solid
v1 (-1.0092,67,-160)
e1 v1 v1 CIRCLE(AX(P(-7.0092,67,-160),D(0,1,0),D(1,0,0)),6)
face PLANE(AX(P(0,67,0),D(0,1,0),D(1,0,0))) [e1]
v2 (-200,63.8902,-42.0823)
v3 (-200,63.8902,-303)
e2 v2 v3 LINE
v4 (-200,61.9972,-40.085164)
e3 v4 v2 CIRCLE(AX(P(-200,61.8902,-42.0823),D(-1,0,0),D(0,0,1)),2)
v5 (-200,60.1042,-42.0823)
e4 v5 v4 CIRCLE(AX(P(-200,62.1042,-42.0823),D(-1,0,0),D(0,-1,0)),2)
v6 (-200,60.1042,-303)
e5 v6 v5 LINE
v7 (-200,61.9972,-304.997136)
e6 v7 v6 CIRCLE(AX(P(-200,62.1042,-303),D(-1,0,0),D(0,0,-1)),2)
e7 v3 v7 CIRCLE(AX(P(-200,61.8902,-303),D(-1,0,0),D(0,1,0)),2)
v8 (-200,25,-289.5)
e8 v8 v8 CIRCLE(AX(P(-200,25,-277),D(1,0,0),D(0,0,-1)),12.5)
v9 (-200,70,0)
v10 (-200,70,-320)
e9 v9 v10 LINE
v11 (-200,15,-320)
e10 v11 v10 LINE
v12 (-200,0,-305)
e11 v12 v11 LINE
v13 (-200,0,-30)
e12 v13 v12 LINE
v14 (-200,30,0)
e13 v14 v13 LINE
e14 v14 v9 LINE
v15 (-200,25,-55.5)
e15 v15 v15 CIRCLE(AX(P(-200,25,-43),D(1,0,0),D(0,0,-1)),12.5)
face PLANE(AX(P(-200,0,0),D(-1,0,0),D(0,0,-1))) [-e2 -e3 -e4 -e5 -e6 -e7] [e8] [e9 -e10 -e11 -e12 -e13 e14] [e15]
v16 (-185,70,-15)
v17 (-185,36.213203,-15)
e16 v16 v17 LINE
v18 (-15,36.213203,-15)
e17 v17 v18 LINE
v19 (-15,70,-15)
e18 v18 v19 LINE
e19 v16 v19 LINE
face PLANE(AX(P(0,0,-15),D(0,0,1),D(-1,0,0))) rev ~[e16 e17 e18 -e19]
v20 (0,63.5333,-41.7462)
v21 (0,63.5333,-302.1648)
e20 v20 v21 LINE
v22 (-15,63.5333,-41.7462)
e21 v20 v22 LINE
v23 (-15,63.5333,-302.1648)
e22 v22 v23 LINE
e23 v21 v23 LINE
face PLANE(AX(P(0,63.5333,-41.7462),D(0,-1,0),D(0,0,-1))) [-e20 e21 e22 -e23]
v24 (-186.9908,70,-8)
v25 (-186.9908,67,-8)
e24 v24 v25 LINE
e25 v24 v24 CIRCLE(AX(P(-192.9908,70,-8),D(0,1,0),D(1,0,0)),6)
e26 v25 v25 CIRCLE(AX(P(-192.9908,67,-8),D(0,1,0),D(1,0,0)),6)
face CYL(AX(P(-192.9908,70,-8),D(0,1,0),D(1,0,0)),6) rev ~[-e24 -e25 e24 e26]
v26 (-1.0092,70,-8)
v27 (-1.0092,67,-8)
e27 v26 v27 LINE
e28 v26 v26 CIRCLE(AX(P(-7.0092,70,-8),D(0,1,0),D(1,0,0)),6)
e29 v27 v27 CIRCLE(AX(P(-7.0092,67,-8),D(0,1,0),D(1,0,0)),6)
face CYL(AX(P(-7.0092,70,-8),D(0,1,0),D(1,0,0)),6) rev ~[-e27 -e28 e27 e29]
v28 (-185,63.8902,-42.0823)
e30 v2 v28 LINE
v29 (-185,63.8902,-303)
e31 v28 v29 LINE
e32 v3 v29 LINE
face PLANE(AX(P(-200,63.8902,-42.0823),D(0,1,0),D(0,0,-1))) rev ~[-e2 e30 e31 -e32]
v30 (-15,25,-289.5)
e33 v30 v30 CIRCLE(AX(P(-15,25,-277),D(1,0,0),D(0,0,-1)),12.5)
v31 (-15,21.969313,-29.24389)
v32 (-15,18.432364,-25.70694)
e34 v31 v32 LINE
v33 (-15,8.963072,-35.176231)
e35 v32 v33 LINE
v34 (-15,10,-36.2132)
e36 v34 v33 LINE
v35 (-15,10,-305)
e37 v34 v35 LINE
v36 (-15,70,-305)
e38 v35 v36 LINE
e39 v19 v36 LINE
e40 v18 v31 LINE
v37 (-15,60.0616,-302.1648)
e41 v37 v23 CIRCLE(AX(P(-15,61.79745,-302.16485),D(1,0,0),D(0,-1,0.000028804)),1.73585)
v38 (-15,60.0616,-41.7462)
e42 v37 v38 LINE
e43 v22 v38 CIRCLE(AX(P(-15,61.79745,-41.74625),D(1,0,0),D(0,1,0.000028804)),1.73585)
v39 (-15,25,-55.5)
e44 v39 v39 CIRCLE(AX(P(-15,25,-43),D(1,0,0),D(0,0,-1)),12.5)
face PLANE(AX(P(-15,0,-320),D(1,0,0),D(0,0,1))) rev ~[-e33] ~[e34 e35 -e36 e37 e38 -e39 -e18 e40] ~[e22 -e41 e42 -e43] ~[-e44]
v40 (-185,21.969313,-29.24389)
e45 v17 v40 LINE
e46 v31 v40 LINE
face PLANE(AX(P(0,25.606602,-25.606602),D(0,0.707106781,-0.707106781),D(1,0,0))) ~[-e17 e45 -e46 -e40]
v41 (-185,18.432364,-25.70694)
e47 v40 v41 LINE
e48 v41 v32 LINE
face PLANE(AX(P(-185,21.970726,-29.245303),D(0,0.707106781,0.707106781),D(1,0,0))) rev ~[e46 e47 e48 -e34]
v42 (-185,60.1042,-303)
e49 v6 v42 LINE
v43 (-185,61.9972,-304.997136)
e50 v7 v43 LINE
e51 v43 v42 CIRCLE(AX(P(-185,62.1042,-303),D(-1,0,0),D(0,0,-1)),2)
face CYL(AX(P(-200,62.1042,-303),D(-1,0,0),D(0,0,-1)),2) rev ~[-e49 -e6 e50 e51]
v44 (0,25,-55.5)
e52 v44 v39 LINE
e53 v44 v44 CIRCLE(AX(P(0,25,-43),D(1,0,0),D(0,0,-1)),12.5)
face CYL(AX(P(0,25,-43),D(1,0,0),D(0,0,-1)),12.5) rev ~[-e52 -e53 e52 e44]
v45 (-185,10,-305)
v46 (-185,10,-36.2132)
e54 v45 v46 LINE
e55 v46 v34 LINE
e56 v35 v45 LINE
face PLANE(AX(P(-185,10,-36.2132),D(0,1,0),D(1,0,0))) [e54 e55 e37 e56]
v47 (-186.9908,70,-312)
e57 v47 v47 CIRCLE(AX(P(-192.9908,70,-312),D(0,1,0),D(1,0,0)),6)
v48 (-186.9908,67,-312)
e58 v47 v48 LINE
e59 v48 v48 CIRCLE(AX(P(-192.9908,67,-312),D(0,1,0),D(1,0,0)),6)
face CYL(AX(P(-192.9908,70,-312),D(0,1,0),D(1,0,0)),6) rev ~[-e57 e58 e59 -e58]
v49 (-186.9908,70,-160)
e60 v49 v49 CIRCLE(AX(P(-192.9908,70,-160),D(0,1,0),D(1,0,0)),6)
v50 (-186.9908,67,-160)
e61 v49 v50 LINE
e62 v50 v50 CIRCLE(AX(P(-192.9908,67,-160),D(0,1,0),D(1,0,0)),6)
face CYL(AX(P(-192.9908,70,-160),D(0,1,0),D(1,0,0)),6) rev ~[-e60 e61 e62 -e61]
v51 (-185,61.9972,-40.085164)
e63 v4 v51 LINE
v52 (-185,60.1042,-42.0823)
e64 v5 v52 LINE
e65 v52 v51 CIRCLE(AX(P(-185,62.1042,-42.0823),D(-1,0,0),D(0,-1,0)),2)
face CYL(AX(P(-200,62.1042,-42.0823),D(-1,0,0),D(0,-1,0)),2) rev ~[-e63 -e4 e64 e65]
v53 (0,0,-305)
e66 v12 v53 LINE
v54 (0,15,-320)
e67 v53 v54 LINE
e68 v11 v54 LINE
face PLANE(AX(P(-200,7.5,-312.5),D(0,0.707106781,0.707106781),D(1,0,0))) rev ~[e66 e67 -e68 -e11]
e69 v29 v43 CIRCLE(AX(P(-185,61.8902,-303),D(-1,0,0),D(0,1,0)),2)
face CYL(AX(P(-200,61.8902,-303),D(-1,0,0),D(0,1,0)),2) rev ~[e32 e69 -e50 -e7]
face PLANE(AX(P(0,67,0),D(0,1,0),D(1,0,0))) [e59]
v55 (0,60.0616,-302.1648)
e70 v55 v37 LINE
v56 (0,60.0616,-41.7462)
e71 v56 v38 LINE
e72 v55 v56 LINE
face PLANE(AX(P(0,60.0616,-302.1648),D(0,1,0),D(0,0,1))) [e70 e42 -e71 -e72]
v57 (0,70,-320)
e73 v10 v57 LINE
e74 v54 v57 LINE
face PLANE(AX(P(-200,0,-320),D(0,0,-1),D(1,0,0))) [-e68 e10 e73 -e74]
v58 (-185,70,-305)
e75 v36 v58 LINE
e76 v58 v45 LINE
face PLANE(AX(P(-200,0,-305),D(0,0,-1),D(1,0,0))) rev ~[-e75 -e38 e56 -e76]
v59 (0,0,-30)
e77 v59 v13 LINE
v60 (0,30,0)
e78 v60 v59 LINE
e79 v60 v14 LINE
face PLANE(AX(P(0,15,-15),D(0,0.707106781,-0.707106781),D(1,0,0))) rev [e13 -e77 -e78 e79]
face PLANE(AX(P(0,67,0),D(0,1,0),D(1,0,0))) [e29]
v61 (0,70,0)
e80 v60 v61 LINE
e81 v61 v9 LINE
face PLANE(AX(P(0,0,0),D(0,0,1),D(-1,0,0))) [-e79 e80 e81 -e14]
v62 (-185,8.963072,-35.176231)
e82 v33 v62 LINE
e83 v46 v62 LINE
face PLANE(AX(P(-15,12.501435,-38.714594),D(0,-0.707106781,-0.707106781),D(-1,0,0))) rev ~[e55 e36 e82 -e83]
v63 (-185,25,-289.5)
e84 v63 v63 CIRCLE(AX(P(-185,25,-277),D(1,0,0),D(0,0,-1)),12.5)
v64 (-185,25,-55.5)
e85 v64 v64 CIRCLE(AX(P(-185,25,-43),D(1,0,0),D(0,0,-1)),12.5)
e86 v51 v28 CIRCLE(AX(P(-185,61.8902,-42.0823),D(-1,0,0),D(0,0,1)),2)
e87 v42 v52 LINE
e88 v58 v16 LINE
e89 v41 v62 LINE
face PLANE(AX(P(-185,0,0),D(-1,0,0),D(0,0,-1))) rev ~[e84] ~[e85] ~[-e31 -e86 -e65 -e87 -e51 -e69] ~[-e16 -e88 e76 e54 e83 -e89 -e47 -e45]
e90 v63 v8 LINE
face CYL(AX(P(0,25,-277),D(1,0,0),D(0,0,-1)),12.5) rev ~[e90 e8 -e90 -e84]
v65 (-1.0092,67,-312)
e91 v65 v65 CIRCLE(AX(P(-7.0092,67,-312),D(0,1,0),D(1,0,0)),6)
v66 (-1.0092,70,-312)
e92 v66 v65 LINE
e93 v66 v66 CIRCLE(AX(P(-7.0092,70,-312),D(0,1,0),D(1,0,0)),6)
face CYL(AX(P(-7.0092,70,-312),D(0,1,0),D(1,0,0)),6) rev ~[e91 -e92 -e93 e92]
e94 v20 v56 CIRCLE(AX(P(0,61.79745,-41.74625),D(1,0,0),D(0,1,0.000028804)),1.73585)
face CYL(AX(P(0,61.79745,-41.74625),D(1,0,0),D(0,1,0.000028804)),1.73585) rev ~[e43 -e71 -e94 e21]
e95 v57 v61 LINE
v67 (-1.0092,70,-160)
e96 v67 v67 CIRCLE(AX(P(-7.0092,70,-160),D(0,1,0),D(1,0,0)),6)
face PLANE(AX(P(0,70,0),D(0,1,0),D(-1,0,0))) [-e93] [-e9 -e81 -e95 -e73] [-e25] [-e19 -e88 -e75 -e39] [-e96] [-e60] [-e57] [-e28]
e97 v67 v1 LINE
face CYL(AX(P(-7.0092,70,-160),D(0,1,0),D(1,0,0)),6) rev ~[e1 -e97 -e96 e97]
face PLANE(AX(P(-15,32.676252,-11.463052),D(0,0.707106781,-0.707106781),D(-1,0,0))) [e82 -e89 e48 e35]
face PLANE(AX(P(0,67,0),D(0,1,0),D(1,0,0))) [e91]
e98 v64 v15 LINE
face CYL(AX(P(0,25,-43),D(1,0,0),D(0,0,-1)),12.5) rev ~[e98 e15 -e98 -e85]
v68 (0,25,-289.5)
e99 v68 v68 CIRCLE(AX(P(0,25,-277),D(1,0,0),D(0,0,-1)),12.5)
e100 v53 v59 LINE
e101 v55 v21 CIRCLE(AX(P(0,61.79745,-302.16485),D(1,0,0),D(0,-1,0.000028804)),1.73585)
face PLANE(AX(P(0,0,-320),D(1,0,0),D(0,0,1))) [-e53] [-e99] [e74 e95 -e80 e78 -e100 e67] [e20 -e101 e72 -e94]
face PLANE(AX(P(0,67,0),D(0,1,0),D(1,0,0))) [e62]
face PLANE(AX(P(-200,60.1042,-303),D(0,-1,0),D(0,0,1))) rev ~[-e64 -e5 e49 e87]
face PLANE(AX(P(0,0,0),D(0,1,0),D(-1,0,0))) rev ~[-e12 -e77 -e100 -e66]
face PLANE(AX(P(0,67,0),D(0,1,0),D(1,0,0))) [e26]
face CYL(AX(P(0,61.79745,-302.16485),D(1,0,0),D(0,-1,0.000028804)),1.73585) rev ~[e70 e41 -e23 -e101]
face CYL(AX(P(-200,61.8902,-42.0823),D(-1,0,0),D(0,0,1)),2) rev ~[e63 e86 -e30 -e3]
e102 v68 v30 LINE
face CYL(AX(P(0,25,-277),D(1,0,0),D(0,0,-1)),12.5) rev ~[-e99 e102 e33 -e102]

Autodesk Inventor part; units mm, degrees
ref_plane "YZ Plane" through (0, 0, 0) normal (1, 0, 0) x (0, 1, 0)
ref_plane "XZ Plane" through (0, 0, 0) normal (0, 1, 0) x (-1, 0, 0)
ref_plane "XY Plane" through (0, 0, 0) normal (0, 0, 1) x (1, 0, 0)
sketch "Sketch1" plane through (0, 0, 0) normal (0, 1, 0) x (-1, 0, 0)
  line L0 (0, 0) -> (200, 0)
  line L1 (200, 0) -> (200, -320)
  line L2 (200, -320) -> (0, -320)
  line L3 (0, -320) -> (0, 0)
  dimension "d0" = 200
  dimension "d1" = 320
extrude "Extrusion1" add sketch "Sketch1" along normal blind 70
chamfer "Chamfer1" distance 30 angle 45 1 edges at (-100, 0, 0)
shell "Shell1" thickness 15 removed faces 1 at (-66.6667, 70, -106.6667)
sketch "Sketch5" plane through (0, 70, 0) normal (0, 1, 0) x (1, 0, 0)
  circle A0 centre (-192.9908, 160) radius 6
  line L0 (-200, 0) -> (0, 0) projected
  circle A1 centre (-192.9908, 8) radius 6
  circle A2 centre (-192.9908, 312) radius 6
  line L1 (-100, -14.4089) -> (-100, 373.6947) construction
  circle A3 centre (-7.0092, 160) radius 6
  circle A4 centre (-7.0092, 8) radius 6
  circle A5 centre (-7.0092, 312) radius 6
  dimension "d40" = 12
  dimension "d41" = 160
  dimension "d42" = 12
  dimension "d43" = 152
  dimension "d44" = 12
  dimension "d45" = 152
extrude "Extrusion5" cut sketch "Sketch5" against normal blind 3
chamfer "Chamfer2" distance 15 angle 45 1 edges at (-100, 0, -320)
sketch "Sketch6" plane through (0, 70, 0) normal (1, 0, 0) x (0, 0, -1)
  circle A0 centre (43, -45) radius 12.5
  line L0 (0, 0) -> (320, 0) projected
  line L1 (0, -40) -> (0, 0) projected
  line L2 (320, 0) -> (0, 0) projected
  line L3 (160, 0) -> (160, -70) construction
  circle A1 centre (277, -45) radius 12.5
  point P0 (0, -70)
  dimension "d51" = 25
  dimension "d52" = 45
  dimension "d53" = 43
sketch "Sketch8" plane through (-185, 15, -36.2132) normal (0, 1, 0) x (1, 0, 0)
  line L0 (170, 0) -> (170, 268.7868) projected
  line L1 (0, 0) -> (170, 0)
  line L2 (170, 0) -> (170, 268.7868)
  line L3 (170, 268.7868) -> (0, 268.7868)
  line L4 (0, 268.7868) -> (0, 0)
  point P0 (185, -36.2132)
extrude "Extrusion6" cut sketch "Sketch8" against normal blind 5
sketch "Sketch9" plane through (-15, 36.2132, -15) normal (0, 0.7071068, -0.7071068) x (-1, 0, 0)
  line L0 (-0.7971, -12.8149) -> (-1.097, -36.2132)
  line L1 (185, -36.2132) -> (-15, -36.2132) projected
  line L2 (0, -33.5355) -> (170, -33.5355) projected
  line L3 (170, 23.8909) -> (170, -181.1701) projected
  line L4 (0, -33.5355) -> (170, -33.5355)
  line L5 (170, -33.5355) -> (170, -20.1439)
  line L6 (170, -20.1439) -> (0, -20.1439)
  line L7 (0, -20.1439) -> (0, -33.5355)
  point P0 (-15, -15)
extrude "Extrusion7" cut sketch "Sketch9" against normal blind 5
extrude "Extrusion8" cut sketch "Sketch6" against normal blind 220
sketch "Sketch10" plane through (0, 70, -320) normal (0, 0, -1) x (-1, 0, 0)
  point P0 (0, -70)
sketch "Sketch11" plane through (0, 70, -320) normal (0, 0, -1) x (-1, 0, 0)
  point P0 (0, -70)
sketch "Sketch12" plane through (0, 70, 0) normal (0, 1, 0) x (1, 0, 0)
  point P0 (0, 0)
sketch "Sketch13" plane through (0, 70, 0) normal (1, 0, 0) x (0, 0, -1)
  point P0 (0, -70)
sketch "Sketch14" plane through (0, 70, -320) normal (0, 0, -1) x (-1, 0, 0)
  point P0 (0, -70)
sketch "Sketch15" plane through (0, 70, 0) normal (1, 0, 0) x (0, 0, -1)
  point P0 (0, -70)
sketch "Sketch16" plane through (0, 70, 0) normal (1, 0, 0) x (0, 0, -1)
  line L0 (41.7462, -8.2025) -> (302.1648, -8.2025) construction
  line L1 (41.7462, -6.4667) -> (302.1648, -6.4667)
  line L2 (302.1648, -9.9384) -> (41.7462, -9.9384)
  arc A0 (41.7462, -6.4667) -> (41.7462, -9.9384) centre (41.7462, -8.2025) ccw
  arc A1 (302.1648, -9.9384) -> (302.1648, -6.4667) centre (302.1648, -8.2025) ccw
  point P0 (0, -70)
  point P1 (171.9555, -8.2025)
extrude "Extrusion10" cut sketch "Sketch16" against normal blind 20
sketch "Sketch18" plane through (-200, 70, -320) normal (-1, 0, 0) x (0, 0, 1)
  line L0 (15, -60) -> (15, 0) projected
  line L1 (277.9177, -6.1098) -> (17, -6.1098)
  line L2 (15, -8.1098) -> (15, -7.8958)
  line L3 (17, -9.8958) -> (277.9177, -9.8958)
  line L4 (279.9177, -7.8958) -> (279.9177, -8.1098)
  arc A0 (17, -6.1098) -> (15, -8.1098) centre (17, -8.1098) ccw
  arc A1 (15, -7.8958) -> (17, -9.8958) centre (17, -7.8958) ccw
  arc A2 (279.9177, -8.1098) -> (277.9177, -6.1098) centre (277.9177, -8.1098) ccw
  arc A3 (277.9177, -9.8958) -> (279.9177, -7.8958) centre (277.9177, -7.8958) ccw
  point P0 (320, -70)
  point P1 (15, -9.8958)
  point P2 (15.0029, -8.0028)
  point P3 (279.9148, -8.0028)
  dimension "d65" = 2
extrude "Extrusion11" cut sketch "Sketch18" against normal blind 20 contours A0 L1 A2 A3 L3 A1
properties material "ABS Plastic"
